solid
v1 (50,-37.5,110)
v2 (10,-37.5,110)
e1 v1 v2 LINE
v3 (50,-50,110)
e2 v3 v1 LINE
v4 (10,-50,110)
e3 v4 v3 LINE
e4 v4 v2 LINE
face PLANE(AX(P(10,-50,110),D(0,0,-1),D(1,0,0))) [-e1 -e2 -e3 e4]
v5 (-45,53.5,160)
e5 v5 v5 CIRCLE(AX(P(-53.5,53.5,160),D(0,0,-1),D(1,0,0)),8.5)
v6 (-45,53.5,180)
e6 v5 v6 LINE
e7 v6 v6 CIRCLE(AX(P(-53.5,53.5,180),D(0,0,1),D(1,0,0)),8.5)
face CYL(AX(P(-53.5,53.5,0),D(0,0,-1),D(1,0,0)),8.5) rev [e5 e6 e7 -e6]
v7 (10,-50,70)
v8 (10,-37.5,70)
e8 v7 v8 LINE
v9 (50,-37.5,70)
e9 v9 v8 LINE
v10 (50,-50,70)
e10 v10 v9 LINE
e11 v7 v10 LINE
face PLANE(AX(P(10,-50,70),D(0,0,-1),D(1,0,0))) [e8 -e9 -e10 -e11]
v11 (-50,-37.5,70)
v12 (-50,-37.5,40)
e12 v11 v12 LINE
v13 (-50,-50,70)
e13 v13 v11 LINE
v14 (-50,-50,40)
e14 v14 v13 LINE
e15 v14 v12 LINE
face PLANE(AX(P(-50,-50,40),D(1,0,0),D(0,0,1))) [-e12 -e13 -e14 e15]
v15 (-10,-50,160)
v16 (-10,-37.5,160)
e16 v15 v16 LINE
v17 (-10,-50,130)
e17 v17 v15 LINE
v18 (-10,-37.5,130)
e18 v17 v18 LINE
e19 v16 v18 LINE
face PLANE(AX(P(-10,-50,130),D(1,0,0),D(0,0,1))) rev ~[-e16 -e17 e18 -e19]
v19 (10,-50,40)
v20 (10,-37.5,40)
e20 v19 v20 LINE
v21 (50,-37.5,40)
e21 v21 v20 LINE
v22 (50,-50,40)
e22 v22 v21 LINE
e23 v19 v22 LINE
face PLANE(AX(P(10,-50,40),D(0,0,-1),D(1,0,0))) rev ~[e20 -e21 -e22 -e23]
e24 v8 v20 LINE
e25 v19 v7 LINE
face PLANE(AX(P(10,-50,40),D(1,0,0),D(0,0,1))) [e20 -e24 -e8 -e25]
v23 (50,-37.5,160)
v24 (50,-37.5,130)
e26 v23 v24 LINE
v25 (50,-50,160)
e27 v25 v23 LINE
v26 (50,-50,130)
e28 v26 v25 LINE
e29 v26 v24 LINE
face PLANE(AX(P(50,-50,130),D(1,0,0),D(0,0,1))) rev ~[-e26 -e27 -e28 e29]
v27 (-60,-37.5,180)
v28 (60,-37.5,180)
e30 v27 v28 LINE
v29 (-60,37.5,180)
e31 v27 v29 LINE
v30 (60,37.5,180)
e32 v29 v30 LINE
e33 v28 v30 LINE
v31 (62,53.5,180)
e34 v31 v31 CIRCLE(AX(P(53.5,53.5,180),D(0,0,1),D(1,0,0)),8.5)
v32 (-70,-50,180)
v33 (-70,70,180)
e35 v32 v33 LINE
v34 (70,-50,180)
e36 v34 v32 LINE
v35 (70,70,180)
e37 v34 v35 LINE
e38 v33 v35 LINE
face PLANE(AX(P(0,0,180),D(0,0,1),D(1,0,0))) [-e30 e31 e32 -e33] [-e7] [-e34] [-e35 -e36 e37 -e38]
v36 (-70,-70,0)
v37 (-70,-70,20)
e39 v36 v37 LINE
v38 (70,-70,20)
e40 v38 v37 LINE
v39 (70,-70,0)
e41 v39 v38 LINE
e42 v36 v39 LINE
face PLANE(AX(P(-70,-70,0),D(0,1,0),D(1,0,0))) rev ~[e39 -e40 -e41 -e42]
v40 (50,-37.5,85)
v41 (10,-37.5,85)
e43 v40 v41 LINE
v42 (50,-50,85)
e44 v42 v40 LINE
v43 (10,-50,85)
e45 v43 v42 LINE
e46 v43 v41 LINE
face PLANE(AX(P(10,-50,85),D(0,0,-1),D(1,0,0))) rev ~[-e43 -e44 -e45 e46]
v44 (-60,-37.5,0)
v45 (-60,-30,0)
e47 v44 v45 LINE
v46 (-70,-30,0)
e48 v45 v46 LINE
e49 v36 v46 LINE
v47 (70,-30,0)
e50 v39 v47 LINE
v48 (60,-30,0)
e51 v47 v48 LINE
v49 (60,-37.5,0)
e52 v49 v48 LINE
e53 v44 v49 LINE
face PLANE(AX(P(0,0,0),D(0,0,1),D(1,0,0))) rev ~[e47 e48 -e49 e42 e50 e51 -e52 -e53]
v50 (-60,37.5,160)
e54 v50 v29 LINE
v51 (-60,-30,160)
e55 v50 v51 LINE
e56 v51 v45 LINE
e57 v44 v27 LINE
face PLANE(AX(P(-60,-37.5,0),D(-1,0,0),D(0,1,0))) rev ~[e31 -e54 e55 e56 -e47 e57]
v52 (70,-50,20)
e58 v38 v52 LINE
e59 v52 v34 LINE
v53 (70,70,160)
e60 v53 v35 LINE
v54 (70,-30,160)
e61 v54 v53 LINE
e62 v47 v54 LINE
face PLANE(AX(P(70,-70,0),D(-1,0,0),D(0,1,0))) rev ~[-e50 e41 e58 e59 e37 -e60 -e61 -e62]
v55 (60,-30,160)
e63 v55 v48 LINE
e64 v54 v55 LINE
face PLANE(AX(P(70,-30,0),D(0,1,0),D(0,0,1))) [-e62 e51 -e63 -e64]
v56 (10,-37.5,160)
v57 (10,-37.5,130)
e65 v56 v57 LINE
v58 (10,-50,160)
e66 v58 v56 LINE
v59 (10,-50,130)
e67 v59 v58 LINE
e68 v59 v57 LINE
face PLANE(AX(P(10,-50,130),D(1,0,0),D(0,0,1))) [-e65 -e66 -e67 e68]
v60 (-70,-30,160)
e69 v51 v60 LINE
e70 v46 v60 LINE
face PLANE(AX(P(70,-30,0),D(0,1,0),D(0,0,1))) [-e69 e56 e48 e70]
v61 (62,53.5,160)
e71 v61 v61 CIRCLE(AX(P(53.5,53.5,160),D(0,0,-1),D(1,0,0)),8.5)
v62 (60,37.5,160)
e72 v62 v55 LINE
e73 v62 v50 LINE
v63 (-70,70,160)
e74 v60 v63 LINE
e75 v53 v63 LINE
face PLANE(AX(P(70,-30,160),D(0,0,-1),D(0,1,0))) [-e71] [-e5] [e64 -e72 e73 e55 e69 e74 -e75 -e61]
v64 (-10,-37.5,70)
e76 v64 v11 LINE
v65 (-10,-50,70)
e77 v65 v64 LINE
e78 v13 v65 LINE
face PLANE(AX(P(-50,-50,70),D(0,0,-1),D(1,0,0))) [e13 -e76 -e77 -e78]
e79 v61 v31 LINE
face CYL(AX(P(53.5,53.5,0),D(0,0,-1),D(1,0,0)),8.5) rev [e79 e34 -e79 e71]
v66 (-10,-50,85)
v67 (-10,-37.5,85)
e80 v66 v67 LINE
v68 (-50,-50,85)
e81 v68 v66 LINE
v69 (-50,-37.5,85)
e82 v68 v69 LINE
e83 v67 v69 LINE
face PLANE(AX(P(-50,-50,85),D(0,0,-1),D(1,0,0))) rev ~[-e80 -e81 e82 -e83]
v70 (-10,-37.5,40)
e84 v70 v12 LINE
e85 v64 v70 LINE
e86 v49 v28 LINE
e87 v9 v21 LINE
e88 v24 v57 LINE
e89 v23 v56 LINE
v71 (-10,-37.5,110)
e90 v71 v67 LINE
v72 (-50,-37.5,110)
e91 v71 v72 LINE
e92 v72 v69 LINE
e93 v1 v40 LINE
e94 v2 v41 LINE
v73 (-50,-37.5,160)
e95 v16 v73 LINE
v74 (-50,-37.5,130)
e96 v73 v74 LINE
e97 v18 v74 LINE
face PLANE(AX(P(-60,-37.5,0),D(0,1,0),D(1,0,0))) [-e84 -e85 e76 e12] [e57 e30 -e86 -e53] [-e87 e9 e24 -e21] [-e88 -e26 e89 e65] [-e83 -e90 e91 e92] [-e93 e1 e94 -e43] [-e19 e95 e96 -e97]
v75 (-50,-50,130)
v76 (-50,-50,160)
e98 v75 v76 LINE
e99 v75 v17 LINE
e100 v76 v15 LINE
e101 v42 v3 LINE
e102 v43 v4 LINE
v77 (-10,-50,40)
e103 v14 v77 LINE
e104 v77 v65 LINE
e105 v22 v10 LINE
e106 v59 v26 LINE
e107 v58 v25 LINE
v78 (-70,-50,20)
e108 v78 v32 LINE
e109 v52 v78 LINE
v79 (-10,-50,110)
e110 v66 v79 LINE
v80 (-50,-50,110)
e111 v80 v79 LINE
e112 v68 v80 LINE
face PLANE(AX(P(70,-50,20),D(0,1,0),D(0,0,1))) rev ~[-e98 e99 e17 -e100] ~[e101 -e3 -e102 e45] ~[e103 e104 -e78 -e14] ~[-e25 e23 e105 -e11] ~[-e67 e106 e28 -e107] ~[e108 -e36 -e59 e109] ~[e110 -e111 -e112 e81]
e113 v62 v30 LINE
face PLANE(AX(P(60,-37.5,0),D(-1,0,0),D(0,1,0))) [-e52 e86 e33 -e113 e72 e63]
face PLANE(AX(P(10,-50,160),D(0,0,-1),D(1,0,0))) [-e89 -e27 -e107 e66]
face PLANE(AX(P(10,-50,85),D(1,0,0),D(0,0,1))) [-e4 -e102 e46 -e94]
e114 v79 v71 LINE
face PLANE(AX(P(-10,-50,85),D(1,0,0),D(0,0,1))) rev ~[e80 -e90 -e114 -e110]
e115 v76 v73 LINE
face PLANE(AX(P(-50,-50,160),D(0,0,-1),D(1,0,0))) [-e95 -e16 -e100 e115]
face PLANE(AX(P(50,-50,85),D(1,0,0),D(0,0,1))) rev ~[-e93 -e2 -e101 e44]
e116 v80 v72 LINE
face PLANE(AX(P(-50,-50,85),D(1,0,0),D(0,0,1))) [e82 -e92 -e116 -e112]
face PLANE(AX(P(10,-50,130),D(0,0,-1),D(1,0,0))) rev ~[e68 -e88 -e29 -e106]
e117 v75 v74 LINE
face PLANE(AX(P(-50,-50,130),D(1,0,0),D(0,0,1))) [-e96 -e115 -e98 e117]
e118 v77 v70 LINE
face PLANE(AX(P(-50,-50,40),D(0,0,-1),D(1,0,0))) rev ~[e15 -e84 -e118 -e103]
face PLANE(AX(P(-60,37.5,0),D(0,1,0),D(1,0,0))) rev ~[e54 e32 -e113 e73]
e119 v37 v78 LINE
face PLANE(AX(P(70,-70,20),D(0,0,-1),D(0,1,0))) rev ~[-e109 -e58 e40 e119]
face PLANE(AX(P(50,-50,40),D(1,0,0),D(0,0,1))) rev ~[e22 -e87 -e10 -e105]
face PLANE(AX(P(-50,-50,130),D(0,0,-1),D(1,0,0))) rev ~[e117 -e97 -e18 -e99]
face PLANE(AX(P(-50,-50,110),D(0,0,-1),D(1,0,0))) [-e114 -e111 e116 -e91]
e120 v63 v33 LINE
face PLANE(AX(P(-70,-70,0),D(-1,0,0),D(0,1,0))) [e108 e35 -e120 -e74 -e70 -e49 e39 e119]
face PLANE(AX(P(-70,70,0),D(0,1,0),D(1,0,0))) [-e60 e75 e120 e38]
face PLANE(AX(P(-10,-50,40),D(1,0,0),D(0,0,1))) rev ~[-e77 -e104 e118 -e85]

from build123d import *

# Parameters (mm, degrees)
F0_W     = 140
F0_H     = 140
F0_R     = 8.5
F0_W_2   = 120
F0_H_2   = 75
F1_DEPTH = 180
F2_W     = 20
F2_H     = 160
F2_W_2   = 100
F3_DEPTH = 140
F4_W     = 40
F4_H     = 30
F4_H_2   = 25
F5_DEPTH = 20


# Not quite as in the source:
# - a feature names something its author has since deleted; it is built from what else it names


with BuildPart() as f1:
    # F0 (on Top) → F1 (new body)
    with BuildSketch(Plane.XY):
        Rectangle(F0_W, F0_H)
        with Locations((-53.5, 53.5)):
            Circle(F0_R, mode=Mode.SUBTRACT)
        Rectangle(F0_W_2, F0_H_2, mode=Mode.SUBTRACT)
        with Locations((53.5, 53.5)):
            Circle(F0_R, mode=Mode.SUBTRACT)
    extrude(amount=F1_DEPTH)

    # F2 (on face) → F3 (cut)
    with BuildSketch(Plane.YZ.offset(70)):
        with Locations((-60, 100)):
            Rectangle(F2_W, F2_H)
        with Locations((20, 80)):
            Rectangle(F2_W_2, F2_H)
    extrude(amount=-F3_DEPTH, mode=Mode.SUBTRACT)

    # F4 (on face) → F5 (cut)
    with BuildSketch(Plane.XZ.offset(50)):
        with Locations((-30, 145)):
            Rectangle(F4_W, F4_H)
        with Locations((30, 145)):
            Rectangle(F4_W, F4_H)
        with Locations((30, 55)):
            Rectangle(F4_W, F4_H)
        with Locations((-30, 55)):
            Rectangle(F4_W, F4_H)
        with Locations((-30, 97.5)):
            Rectangle(F4_W, F4_H_2)
        with Locations((30, 97.5)):
            Rectangle(F4_W, F4_H_2)
    extrude(amount=-F5_DEPTH, mode=Mode.SUBTRACT)


solid = f1.part
